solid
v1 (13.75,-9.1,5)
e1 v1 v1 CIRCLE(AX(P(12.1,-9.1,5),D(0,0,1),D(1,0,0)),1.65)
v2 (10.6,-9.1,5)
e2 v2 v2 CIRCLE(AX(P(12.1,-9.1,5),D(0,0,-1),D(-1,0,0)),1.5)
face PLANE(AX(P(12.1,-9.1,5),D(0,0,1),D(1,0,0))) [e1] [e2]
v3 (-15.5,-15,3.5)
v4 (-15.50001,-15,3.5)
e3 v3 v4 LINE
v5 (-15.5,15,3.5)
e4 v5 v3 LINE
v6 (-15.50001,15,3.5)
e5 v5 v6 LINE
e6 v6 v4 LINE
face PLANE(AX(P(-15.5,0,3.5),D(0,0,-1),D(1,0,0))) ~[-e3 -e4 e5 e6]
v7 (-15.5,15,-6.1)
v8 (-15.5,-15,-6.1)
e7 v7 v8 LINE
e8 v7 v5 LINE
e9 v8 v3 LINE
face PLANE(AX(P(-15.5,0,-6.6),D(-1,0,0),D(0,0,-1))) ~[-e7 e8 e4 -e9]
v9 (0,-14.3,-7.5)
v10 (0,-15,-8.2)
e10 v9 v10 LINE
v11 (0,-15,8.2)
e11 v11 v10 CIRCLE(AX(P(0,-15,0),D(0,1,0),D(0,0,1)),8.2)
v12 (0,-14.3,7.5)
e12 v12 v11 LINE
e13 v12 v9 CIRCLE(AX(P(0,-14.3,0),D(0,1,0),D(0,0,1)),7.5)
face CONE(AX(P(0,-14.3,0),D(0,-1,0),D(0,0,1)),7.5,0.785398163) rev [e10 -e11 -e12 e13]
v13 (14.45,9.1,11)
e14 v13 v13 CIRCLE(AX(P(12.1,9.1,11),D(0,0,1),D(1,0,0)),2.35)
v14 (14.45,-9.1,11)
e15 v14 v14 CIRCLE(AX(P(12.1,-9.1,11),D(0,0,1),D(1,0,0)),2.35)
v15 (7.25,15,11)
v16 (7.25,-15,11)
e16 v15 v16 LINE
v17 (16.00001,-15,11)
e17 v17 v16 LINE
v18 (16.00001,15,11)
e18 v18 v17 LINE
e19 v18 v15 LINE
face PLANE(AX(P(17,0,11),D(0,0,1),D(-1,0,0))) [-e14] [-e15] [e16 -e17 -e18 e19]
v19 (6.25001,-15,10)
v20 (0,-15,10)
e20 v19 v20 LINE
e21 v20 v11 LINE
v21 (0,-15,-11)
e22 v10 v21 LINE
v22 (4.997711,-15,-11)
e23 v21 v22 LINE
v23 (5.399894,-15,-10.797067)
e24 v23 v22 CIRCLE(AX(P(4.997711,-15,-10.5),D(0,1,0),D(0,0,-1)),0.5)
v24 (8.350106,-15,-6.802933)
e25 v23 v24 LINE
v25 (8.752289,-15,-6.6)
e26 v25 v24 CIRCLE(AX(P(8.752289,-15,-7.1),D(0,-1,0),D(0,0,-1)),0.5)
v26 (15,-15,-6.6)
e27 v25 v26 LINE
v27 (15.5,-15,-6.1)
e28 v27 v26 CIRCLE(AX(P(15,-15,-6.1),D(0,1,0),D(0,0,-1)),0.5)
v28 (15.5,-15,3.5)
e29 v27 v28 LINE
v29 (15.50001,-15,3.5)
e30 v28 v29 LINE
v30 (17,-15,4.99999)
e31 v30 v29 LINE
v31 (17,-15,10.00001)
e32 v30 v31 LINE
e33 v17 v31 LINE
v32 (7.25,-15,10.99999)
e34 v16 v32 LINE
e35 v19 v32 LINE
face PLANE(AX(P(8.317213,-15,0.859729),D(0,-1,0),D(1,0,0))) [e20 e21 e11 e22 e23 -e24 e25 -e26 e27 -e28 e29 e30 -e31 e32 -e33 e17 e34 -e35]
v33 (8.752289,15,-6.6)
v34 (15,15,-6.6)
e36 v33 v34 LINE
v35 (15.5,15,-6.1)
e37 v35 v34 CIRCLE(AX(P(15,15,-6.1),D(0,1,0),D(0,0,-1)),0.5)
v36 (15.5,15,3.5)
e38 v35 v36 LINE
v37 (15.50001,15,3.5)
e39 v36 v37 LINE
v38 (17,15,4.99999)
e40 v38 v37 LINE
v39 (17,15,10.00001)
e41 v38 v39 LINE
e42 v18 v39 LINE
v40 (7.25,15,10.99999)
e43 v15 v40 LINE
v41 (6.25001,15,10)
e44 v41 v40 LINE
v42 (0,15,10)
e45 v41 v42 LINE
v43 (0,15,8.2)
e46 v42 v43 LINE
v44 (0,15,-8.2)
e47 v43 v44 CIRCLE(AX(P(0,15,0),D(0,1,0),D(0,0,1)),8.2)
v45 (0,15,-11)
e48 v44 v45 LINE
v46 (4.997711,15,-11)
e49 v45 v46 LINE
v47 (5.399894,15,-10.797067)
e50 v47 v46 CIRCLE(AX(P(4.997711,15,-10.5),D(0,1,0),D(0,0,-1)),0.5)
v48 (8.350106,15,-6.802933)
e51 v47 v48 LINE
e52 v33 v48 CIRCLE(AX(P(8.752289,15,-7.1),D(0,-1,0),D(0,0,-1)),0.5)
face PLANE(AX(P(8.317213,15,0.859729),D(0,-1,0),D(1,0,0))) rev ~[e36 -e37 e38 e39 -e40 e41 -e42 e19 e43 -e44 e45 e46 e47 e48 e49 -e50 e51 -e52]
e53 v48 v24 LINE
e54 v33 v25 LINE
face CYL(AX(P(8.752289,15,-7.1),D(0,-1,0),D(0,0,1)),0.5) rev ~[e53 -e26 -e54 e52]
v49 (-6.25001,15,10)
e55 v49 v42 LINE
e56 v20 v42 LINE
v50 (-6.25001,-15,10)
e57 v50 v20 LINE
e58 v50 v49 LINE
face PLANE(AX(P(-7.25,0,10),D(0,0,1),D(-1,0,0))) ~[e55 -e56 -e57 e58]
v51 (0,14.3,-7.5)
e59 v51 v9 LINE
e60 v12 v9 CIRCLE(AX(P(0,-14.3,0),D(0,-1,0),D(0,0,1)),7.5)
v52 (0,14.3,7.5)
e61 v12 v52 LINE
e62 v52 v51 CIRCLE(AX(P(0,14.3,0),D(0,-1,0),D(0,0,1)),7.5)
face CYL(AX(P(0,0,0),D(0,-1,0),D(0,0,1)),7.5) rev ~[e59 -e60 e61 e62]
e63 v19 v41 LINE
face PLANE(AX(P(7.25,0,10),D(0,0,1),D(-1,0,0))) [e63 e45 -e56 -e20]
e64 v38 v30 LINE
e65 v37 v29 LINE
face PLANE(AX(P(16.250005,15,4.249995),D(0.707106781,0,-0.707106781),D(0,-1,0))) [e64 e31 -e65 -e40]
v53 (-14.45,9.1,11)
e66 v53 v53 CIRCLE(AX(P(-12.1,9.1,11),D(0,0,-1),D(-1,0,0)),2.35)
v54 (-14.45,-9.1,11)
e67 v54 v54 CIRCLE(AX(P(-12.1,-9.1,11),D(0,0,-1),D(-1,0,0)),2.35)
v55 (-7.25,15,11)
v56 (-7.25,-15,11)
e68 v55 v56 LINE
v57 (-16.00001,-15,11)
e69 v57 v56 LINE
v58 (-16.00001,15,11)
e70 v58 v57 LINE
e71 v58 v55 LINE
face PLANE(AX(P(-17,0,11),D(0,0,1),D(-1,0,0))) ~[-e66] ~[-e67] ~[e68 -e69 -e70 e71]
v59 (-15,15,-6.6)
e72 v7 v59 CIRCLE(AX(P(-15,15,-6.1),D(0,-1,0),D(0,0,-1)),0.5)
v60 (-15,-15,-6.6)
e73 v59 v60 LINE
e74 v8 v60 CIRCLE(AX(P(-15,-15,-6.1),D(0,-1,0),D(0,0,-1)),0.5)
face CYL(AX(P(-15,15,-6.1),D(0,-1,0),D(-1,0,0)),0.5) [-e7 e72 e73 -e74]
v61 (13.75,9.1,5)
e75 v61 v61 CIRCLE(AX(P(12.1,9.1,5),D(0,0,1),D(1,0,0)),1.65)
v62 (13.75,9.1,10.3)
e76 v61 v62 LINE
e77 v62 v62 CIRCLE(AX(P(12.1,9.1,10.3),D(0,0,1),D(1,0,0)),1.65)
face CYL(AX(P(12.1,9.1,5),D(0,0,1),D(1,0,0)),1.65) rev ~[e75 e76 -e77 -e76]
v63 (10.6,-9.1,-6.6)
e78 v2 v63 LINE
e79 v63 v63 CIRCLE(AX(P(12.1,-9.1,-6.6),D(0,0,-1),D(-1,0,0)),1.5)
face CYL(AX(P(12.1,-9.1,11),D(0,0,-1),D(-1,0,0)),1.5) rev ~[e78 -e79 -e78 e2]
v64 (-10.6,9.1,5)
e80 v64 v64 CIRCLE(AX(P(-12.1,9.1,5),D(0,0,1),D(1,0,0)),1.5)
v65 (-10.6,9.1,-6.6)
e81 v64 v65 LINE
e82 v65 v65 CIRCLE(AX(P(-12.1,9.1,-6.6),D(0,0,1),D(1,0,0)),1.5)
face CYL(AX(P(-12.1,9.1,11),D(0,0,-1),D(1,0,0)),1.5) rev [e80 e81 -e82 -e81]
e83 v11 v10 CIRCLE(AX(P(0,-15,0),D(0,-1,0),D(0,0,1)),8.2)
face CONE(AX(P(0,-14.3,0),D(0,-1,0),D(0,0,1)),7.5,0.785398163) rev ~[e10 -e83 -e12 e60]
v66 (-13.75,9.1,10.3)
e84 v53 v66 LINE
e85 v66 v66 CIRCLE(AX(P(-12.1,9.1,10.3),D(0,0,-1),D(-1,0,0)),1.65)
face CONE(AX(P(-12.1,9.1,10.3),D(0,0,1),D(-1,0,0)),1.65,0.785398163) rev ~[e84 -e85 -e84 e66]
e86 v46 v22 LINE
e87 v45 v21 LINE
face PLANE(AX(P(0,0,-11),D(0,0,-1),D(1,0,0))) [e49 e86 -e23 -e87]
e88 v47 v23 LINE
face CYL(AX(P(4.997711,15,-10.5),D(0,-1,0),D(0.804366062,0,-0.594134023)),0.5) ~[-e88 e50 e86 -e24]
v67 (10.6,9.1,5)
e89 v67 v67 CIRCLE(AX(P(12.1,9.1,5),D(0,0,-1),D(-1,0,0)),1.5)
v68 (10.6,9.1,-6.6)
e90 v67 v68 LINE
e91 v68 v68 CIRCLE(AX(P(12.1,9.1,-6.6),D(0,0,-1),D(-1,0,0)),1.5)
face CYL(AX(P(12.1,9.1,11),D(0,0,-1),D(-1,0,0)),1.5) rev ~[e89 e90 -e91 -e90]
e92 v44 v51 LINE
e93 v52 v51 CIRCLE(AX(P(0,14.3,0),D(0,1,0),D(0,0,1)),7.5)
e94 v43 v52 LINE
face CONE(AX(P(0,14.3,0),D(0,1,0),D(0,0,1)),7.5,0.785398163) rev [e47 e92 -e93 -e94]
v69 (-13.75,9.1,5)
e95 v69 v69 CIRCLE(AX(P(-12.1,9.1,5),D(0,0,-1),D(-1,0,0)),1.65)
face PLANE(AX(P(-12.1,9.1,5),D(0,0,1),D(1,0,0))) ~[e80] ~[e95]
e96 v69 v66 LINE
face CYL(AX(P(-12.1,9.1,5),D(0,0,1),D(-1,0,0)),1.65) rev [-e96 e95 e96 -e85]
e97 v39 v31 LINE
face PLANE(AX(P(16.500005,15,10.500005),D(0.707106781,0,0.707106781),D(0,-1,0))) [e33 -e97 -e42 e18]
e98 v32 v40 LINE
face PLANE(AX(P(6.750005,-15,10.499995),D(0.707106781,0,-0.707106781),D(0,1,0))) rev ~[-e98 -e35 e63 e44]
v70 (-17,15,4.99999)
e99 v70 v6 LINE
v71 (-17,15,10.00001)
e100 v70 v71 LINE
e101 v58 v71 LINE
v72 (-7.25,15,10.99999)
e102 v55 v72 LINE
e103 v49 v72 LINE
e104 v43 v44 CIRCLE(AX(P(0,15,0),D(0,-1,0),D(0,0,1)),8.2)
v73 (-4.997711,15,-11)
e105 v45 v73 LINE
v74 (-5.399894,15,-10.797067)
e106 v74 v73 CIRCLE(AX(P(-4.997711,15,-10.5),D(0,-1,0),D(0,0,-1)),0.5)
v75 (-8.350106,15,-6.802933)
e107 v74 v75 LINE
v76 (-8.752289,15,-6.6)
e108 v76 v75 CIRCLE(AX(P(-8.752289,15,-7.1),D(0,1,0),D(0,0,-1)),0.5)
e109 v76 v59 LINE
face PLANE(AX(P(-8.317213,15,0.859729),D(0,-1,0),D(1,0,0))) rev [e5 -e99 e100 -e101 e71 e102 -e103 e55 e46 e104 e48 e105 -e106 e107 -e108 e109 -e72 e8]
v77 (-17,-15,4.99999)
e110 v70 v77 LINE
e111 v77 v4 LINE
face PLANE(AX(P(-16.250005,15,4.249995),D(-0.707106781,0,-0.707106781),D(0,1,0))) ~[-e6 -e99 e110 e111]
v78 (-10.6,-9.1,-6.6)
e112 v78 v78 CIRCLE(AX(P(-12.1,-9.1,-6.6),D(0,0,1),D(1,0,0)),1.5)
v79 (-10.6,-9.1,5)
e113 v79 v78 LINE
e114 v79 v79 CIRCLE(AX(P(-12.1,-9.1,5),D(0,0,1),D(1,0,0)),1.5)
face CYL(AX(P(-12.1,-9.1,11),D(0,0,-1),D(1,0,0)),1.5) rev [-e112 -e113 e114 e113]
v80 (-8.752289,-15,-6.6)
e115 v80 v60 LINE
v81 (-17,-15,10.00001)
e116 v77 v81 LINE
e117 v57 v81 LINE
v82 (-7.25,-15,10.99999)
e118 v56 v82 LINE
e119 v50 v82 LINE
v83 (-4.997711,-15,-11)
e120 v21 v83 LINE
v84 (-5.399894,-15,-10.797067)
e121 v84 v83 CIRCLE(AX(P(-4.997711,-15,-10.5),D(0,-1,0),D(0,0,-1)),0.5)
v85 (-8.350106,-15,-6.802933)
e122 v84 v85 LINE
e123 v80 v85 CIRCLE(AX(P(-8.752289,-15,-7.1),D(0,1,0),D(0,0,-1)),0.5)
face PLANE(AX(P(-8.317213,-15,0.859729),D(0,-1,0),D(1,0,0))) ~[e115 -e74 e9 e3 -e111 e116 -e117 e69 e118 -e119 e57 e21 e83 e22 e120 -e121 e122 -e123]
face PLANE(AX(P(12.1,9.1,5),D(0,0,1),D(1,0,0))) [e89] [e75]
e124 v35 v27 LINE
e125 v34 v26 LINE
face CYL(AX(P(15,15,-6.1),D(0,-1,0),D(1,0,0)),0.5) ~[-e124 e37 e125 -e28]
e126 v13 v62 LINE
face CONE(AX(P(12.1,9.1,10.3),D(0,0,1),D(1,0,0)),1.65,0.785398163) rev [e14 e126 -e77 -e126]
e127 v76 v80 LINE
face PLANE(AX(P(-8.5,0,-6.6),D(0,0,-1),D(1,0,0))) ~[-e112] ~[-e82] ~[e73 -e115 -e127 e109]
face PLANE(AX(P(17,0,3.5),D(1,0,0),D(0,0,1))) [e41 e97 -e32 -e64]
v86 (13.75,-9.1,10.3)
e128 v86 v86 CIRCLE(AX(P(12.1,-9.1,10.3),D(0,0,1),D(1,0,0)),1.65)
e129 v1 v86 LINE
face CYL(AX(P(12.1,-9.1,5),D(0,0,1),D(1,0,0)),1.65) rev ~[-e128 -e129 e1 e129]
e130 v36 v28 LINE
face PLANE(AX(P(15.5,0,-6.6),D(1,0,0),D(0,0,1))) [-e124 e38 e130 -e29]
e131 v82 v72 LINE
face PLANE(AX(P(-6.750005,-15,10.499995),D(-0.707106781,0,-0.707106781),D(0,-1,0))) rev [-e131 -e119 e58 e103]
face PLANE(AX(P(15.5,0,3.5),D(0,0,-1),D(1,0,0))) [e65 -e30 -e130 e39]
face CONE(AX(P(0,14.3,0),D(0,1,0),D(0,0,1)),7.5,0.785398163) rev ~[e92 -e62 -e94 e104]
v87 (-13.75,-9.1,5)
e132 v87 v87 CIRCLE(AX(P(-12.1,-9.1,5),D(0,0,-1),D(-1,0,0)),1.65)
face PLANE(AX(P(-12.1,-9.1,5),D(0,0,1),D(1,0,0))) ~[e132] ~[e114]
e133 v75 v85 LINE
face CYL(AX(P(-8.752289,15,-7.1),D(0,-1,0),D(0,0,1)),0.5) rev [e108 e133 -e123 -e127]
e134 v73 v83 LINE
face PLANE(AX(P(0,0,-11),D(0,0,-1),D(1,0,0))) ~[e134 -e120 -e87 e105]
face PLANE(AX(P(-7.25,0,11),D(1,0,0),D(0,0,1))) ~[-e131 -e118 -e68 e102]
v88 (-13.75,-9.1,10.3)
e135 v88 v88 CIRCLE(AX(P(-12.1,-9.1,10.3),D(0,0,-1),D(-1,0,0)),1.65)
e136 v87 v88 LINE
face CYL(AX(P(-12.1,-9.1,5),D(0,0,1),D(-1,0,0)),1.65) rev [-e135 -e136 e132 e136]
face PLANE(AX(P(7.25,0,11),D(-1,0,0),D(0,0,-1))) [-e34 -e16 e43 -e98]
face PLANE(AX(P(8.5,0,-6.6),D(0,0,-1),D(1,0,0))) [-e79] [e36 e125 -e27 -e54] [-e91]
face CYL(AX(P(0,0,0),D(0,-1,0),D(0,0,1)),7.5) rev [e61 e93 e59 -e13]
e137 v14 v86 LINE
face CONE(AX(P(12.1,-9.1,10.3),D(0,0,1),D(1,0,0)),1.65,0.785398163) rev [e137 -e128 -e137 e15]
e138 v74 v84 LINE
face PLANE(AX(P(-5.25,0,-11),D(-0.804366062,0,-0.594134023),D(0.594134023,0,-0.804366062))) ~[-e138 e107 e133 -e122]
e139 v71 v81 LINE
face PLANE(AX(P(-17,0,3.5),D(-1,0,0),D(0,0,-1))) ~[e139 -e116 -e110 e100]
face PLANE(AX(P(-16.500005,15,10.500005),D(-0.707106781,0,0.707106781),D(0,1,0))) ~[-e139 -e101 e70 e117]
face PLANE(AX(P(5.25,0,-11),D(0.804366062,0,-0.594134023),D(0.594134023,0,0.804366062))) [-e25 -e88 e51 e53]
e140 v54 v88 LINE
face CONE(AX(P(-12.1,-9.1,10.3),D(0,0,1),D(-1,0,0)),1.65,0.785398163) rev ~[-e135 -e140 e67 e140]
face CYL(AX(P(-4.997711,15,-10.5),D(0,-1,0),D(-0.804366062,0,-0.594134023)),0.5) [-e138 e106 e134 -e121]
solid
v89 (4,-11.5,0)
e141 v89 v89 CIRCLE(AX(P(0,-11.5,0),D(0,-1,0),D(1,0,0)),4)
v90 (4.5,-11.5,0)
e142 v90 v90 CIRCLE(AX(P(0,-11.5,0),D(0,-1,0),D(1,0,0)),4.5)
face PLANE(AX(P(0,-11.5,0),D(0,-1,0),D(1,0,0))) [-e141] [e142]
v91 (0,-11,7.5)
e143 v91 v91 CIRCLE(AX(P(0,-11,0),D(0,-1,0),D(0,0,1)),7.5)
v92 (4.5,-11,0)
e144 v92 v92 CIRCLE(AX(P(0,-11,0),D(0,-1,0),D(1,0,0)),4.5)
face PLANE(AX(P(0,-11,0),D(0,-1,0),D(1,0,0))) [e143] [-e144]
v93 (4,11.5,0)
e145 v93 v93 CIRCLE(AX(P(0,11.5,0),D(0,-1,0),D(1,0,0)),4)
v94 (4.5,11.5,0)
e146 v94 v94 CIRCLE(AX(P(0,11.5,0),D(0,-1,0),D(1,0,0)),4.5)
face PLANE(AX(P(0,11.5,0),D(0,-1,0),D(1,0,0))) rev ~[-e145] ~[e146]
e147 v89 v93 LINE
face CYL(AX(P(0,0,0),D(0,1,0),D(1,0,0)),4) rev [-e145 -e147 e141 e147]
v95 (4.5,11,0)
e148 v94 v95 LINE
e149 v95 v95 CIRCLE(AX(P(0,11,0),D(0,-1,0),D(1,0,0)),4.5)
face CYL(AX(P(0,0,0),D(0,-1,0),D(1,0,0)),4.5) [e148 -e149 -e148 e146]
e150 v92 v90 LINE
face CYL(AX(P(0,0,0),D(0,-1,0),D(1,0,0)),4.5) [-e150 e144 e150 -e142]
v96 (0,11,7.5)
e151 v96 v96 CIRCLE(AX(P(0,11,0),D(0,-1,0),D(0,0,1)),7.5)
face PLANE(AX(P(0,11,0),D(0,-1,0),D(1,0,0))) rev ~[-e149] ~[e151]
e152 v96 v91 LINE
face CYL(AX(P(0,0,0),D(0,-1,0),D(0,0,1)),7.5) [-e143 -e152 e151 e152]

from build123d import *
from build123d import SkipClean  # not in build123d's __all__

# Parameters (mm, degrees)
F1_DEPTH       = 15
F2_SIZE        = 0.99999
F3_SIZE        = 1.49999
F4_R           = 0.5
F6_D           = 3
F6_CBORE_D     = 3.3
F6_CBORE_DEPTH = 6
F7_SIZE        = 0.7
F0_R           = 4.5
F8_DEPTH       = 11
F0_R_2         = 4
F9_DEPTH       = 11.5


# Not quite as in the source:
# - a fillet or chamfer is up to 0.001 mm smaller than in the source, because OpenCascade refuses the exact size


with BuildPart() as f1:
    # F0 (on Front) → F1 (new body, symmetric)
    with BuildSketch(Plane.XZ):
        with BuildLine():
            ThreePointArc((0, 7.5), (5.3033008589, 5.3033008589), (7.5, 0))
            ThreePointArc((7.5, 0), (5.3033008589, -5.3033008589), (0, -7.5))
            Line((0, -7.5), (0, -11))
            Line((0, -11), (5.25, -11))
            Line((5.25, -11), (8.5, -6.6))
            Line((8.5, -6.6), (15.5, -6.6))
            Line((15.5, -6.6), (15.5, 3.5))
            Line((15.5, 3.5), (17, 3.5))
            Line((17, 3.5), (17, 11))
            Line((17, 11), (7.25, 11))
            Line((7.25, 11), (7.25, 10))
            Line((7.25, 10), (0, 10))
            Line((0, 10), (0, 7.5))
        make_face()
    extrude(amount=F1_DEPTH, both=True)

    # F2 (size 1 in the source; OpenCascade refuses exactly that, so slightly less here)
    f2_edges = [f1.edges().sort_by_distance(p)[0] for p in [
        (7.25, 0, 10),
        (17, 0, 11),
    ]]
    chamfer(f2_edges, length=F2_SIZE)

    # F3 (size 1.5 in the source; OpenCascade refuses exactly that, so slightly less here)
    f3_edges = [f1.edges().sort_by_distance(p)[0] for p in [
        (17, 0, 3.5),
    ]]
    chamfer(f3_edges, length=F3_SIZE)

    # F4
    f4_edges = [f1.edges().sort_by_distance(p)[0] for p in [
        (15.5, 0, -6.6),
        (8.5, 0, -6.6),
        (5.25, 0, -11),
    ]]
    fillet(f4_edges, radius=F4_R)

    # F6 (through all)
    with Locations(Plane.XY.offset(11)):
        with Locations((12.1, 9.1), (12.1, -9.1)):
            CounterBoreHole(F6_D / 2, F6_CBORE_D / 2, F6_CBORE_DEPTH)

    # F7
    f7_edges = [f1.edges().sort_by_distance(p)[0] for p in [
        (7.5, -15, 0),
        (7.5, 15, 0),
        (10.45, 9.1, 11),
        (10.45, -9.1, 11),
    ]]
    chamfer(f7_edges, length=F7_SIZE)

    # F10: F1 across plane


with BuildPart() as f8:
    # F0 (on Front) → F8 (new body, symmetric)
    with BuildSketch(Plane.XZ):
        with BuildLine():
            ThreePointArc((0, -7.5), (5.3033008589, -5.3033008589), (7.5, 0))
            ThreePointArc((7.5, 0), (5.3033008589, 5.3033008589), (0, 7.5))
            ThreePointArc((0, 7.5), (-7.5, 0), (0, -7.5))
        make_face()
        Circle(F0_R, mode=Mode.SUBTRACT)
    extrude(amount=F8_DEPTH, both=True)

    # F0 (on Front) → F9 (join, symmetric)
    with BuildSketch(Plane.XZ):
        Circle(F0_R)
        Circle(F0_R_2, mode=Mode.SUBTRACT)
    extrude(amount=F9_DEPTH, both=True)


with BuildPart() as f1_1:
    add(f1.part, clean=False)
    with SkipClean():  # cleaning this boolean's faces spoils the solid; the shape is the same uncleaned
        add(f1.part.mirror(Plane.YZ), clean=False)


solid = Compound([f8.part, f1_1.part])
